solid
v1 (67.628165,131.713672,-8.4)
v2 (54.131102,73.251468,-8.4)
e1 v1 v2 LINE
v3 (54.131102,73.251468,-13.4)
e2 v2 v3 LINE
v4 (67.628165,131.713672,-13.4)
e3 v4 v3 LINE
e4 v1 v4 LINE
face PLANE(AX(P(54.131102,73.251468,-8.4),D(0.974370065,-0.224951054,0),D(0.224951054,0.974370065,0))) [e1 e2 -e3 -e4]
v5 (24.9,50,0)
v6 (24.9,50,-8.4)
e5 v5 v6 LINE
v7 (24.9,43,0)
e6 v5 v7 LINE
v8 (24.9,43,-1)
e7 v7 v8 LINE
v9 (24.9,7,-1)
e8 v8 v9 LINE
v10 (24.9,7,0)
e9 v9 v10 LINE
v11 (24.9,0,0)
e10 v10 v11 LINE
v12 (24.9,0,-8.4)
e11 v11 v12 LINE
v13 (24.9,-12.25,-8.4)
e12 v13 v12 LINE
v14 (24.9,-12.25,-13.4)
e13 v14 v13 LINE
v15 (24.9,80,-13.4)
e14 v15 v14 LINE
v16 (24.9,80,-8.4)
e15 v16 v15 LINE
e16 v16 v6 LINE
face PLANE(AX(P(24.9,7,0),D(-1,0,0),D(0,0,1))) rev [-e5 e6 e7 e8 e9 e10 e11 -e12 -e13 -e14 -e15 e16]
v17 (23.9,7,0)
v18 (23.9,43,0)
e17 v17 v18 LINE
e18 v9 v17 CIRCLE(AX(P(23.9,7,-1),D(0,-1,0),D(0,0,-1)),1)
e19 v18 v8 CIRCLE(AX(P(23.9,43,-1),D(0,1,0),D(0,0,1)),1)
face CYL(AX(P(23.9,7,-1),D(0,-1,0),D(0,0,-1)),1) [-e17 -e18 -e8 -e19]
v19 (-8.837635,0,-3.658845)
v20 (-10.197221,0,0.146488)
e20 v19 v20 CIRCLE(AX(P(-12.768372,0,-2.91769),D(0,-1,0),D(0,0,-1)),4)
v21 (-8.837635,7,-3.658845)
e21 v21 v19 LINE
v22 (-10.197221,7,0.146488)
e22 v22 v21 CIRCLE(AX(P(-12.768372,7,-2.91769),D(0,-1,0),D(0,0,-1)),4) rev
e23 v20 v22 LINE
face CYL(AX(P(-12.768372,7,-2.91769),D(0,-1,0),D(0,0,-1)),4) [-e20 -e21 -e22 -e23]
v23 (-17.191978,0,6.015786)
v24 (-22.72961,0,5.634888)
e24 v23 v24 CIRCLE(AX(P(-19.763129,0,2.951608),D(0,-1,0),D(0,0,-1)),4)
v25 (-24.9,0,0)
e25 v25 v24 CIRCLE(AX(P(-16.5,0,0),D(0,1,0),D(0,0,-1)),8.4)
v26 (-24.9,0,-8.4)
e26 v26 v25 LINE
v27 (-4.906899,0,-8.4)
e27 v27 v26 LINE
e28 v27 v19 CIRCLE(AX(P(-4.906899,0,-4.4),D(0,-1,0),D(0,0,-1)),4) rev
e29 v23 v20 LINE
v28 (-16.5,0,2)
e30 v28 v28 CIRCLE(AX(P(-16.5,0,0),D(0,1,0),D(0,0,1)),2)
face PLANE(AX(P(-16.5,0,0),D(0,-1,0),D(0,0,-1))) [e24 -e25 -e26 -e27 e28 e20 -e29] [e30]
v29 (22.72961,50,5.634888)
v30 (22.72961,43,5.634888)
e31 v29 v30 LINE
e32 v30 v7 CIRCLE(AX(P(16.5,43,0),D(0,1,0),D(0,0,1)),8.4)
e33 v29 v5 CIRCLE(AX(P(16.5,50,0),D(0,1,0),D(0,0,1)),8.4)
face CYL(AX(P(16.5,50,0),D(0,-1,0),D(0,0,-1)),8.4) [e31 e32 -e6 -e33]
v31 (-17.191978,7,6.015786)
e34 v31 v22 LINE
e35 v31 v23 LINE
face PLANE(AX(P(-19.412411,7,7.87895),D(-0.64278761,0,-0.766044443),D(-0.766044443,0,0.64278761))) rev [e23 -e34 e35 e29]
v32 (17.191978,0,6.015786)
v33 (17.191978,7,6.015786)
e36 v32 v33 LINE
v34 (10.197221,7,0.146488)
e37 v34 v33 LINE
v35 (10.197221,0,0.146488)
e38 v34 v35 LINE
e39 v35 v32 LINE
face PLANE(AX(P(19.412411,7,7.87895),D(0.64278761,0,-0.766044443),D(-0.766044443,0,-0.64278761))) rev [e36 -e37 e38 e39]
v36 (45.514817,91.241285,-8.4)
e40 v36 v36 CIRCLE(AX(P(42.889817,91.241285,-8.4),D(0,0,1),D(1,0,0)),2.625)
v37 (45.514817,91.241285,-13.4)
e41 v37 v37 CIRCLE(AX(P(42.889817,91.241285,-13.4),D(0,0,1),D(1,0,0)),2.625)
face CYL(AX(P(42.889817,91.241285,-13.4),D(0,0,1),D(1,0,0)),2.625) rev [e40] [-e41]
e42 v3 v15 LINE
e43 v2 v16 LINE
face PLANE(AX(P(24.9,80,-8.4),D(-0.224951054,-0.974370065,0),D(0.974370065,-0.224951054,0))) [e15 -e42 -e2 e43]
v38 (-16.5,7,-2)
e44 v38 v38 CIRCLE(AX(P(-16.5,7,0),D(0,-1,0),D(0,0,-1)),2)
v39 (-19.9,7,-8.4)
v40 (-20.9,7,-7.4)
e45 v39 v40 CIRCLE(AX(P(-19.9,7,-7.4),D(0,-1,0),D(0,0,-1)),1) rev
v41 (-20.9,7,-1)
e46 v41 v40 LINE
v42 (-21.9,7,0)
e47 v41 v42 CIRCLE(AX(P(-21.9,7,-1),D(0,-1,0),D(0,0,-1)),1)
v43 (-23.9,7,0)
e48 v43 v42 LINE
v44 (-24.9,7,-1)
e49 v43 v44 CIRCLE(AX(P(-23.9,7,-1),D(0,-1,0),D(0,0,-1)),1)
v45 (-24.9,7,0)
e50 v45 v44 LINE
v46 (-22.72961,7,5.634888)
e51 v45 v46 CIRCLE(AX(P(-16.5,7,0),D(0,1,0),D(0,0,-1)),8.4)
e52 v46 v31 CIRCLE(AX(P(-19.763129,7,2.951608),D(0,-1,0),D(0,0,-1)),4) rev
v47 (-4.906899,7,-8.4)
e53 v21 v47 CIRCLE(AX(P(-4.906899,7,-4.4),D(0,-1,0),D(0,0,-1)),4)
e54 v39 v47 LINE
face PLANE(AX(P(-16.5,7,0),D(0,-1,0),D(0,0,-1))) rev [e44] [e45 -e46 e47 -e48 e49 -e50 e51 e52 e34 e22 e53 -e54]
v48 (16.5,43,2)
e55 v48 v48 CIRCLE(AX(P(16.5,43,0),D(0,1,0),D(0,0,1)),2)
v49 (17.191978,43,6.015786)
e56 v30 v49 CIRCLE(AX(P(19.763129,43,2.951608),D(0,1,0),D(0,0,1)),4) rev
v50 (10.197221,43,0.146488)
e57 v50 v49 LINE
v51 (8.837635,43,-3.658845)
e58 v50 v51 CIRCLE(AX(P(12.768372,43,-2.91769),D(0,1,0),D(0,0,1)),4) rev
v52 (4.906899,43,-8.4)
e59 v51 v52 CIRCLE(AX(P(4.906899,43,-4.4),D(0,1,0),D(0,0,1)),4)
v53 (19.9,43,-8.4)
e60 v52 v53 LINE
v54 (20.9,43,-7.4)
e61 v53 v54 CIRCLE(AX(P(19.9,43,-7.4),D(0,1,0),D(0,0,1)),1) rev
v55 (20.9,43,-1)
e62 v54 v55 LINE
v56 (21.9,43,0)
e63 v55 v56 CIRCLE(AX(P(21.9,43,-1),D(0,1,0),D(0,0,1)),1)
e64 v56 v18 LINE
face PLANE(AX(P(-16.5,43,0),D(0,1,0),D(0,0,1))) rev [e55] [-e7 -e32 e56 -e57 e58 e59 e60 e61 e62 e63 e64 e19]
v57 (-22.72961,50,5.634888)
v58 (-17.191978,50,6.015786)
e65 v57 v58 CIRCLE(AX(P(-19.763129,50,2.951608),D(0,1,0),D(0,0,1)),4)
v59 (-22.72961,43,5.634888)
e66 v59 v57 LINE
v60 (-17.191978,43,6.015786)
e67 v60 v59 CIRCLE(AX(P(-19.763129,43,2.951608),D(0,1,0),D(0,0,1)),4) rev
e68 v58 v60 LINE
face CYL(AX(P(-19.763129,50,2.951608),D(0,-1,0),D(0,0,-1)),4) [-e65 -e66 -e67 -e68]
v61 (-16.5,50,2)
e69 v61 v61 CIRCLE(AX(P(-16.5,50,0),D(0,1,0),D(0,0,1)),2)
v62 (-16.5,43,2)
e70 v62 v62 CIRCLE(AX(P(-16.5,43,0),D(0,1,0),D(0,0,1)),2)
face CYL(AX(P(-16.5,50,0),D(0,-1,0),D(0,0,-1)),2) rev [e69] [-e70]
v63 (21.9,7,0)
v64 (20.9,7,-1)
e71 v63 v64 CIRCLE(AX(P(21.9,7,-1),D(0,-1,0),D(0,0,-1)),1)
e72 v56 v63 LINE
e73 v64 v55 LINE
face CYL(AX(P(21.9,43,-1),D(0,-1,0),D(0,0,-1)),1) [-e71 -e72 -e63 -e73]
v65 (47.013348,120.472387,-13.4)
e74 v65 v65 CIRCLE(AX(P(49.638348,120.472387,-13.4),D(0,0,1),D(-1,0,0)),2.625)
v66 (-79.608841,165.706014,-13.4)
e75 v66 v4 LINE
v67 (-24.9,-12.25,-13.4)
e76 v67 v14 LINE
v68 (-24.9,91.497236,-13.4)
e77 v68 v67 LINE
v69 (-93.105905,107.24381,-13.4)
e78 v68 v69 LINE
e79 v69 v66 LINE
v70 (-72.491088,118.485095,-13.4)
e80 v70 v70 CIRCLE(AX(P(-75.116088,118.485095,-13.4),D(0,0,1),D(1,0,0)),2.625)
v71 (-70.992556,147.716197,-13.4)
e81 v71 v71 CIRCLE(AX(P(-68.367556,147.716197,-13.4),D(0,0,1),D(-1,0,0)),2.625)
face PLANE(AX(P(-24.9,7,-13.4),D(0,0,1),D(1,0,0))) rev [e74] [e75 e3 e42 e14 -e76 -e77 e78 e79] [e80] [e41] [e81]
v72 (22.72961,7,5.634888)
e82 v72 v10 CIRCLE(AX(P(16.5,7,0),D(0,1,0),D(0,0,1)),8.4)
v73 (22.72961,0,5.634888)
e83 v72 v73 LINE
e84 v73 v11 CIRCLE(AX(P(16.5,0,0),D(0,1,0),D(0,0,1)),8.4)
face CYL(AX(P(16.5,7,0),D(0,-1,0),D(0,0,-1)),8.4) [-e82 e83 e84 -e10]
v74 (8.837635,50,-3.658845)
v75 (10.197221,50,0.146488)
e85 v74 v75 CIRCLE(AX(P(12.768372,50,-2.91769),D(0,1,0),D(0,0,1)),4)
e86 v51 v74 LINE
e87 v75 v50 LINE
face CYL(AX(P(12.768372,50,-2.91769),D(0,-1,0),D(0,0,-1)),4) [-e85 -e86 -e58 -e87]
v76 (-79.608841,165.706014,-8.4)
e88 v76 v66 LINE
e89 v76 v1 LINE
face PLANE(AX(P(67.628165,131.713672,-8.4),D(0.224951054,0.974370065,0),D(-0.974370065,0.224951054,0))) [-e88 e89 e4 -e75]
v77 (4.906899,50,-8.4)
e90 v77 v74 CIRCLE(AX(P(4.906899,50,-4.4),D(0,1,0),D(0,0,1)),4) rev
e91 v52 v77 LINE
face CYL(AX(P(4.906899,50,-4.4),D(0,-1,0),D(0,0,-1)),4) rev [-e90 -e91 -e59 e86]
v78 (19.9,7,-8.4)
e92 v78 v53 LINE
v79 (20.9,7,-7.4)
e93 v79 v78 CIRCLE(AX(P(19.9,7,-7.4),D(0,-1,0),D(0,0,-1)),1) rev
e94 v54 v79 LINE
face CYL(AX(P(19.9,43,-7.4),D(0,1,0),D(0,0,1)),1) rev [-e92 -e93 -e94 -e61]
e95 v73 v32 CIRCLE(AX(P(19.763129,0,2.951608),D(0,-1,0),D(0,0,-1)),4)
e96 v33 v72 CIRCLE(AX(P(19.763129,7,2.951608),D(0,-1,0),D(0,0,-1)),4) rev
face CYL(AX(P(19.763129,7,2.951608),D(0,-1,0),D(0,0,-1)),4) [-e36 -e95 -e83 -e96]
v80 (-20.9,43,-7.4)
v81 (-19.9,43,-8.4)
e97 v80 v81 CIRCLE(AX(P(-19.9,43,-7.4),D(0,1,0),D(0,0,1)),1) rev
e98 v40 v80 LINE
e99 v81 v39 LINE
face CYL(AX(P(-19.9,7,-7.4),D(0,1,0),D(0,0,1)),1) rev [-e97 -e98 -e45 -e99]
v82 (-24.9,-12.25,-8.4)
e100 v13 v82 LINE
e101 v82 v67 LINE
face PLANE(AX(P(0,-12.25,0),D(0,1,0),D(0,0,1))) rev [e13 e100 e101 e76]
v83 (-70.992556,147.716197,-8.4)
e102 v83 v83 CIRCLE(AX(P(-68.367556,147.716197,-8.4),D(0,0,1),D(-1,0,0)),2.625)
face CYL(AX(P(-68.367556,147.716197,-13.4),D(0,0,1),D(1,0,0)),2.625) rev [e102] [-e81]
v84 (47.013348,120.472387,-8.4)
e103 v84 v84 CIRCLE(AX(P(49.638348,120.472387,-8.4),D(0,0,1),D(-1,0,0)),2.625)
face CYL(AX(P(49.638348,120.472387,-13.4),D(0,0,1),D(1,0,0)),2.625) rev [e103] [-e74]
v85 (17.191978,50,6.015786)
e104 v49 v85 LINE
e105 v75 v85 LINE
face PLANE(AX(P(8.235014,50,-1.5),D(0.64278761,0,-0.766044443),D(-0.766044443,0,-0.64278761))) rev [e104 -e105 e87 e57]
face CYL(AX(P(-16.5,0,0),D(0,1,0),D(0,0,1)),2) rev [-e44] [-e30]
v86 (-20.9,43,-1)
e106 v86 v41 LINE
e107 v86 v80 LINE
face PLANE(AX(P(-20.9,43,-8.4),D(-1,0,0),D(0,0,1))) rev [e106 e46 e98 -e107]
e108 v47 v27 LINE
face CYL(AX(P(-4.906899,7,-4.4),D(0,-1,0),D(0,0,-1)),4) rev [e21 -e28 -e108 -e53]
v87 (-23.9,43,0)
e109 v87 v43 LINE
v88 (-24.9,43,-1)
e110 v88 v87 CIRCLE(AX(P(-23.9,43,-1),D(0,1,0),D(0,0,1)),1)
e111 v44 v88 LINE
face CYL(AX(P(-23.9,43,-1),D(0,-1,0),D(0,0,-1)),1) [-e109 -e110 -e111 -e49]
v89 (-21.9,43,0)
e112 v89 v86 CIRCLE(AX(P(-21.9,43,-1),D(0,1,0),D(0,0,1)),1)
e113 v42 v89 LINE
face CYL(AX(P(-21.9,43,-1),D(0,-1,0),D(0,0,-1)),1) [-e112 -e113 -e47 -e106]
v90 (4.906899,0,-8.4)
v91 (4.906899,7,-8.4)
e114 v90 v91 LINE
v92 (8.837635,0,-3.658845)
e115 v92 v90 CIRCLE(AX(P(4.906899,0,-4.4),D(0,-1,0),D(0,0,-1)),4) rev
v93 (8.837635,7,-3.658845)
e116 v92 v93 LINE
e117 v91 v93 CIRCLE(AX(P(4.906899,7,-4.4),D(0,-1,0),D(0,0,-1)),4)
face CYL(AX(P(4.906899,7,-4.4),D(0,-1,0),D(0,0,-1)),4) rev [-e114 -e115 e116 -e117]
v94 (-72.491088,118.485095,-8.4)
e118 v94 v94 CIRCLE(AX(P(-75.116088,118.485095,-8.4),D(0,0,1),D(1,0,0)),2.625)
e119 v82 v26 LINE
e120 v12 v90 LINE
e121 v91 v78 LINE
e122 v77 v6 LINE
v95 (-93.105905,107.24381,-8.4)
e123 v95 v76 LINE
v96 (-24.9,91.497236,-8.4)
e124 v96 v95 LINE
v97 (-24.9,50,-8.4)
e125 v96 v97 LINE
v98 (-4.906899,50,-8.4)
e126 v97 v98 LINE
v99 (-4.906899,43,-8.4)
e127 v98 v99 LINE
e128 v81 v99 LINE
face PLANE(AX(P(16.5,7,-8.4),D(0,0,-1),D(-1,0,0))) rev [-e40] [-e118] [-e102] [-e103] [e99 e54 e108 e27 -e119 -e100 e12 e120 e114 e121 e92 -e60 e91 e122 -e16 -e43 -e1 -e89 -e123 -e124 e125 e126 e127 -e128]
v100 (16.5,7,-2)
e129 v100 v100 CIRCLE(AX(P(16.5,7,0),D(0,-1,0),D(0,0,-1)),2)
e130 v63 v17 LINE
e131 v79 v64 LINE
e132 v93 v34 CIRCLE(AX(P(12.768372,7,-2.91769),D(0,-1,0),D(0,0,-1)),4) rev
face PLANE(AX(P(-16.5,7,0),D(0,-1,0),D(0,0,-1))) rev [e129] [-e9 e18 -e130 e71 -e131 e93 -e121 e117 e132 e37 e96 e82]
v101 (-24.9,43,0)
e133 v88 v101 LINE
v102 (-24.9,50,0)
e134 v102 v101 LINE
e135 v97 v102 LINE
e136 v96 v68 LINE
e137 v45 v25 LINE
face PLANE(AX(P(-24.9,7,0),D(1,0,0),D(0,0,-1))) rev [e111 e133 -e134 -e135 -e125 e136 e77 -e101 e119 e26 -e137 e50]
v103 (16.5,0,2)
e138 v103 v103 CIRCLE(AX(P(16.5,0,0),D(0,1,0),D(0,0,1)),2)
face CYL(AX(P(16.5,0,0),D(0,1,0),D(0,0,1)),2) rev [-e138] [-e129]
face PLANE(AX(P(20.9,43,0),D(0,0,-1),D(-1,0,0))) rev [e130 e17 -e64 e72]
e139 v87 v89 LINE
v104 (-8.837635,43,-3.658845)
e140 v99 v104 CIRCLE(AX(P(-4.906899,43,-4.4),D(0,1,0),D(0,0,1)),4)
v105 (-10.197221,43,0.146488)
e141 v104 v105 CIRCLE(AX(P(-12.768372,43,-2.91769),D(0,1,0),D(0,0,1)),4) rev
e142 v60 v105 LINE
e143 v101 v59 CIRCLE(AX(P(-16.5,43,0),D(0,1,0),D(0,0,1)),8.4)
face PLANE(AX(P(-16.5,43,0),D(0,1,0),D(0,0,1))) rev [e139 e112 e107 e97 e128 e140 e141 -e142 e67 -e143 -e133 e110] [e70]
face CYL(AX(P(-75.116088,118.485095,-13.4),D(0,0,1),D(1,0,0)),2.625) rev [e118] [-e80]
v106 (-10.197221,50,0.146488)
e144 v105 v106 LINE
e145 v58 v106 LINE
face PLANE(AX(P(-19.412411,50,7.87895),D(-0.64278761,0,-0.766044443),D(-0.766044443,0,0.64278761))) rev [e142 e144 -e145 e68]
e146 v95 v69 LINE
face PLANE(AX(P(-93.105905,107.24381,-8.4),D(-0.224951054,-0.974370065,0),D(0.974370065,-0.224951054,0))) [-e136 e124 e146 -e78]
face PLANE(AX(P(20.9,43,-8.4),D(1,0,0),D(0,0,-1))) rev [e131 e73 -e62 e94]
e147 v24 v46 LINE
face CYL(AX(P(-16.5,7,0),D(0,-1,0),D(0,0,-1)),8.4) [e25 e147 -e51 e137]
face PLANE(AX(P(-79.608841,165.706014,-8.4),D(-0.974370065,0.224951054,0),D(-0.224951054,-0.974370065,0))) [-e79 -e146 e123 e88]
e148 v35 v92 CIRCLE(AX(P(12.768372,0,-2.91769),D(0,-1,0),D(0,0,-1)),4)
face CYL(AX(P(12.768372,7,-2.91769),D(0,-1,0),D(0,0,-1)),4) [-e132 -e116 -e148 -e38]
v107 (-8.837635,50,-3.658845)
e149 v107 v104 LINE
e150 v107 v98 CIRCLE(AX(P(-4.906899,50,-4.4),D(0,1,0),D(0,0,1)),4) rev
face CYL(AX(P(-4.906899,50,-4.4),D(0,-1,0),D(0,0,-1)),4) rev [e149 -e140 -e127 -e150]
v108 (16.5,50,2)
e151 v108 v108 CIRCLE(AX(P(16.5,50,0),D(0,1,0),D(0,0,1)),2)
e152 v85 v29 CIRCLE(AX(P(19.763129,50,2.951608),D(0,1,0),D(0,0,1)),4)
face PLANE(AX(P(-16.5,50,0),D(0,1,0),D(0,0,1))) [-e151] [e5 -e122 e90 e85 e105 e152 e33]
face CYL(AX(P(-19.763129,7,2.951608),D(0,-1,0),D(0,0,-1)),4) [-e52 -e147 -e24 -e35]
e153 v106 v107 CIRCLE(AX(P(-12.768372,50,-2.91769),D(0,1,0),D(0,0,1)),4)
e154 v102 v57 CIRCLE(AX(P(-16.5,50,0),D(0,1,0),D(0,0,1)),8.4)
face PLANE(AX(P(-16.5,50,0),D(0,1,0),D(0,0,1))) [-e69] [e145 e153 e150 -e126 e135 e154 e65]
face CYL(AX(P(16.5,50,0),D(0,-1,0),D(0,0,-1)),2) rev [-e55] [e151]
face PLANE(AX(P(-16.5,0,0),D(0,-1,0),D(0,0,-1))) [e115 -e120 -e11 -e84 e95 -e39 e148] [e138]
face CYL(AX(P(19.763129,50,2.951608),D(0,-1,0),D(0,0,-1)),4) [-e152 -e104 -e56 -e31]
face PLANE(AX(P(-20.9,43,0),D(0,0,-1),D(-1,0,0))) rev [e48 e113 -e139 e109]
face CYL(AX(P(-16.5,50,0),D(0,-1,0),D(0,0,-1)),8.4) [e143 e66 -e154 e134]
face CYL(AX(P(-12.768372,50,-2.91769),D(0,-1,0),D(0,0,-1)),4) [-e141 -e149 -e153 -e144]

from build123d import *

# Parameters (mm, degrees)
BOSS_EXTRUDE2_DEPTH     = 7
CUT_EXTRUDE2_DEPTH      = 30.130224853
CUT_EXTRUDE2_DEPTH_BACK = 30.130224853
SKETCH3_R               = 2
BOSS_EXTRUDE3_DEPTH     = 36
SKETCH5_R               = 2
BOSS_EXTRUDE4_DEPTH     = 7
SKETCH14_W              = 49.8
SKETCH14_H              = 5
BOSS_EXTRUDE7_DEPTH     = 30
SKETCH16_W              = 49.8
SKETCH16_H              = 5
BOSS_EXTRUDE8_DEPTH     = 12.25
BOSS_EXTRUDE9_DEPTH     = 5
FILLET1_DEPTH           = 50
FILLET1_2_DEPTH         = 7
FILLET1_START           = 43
FILLET1_3_DEPTH         = 7
FILLET2_R               = 4
FILLET3_R               = 1
CUT_EXTRUDE3_DEPTH      = 191.690493415
CUT_EXTRUDE3_DEPTH_BACK = 191.690493415
SKETCH19_R              = 2.625


with BuildPart() as part:
    # Sketch1 → Boss-Extrude2 (new body)
    with BuildSketch(Plane(origin=(0, 0, 0), x_dir=(1, 0, 0), z_dir=(0, 1, 0))):
        with BuildLine():
            Line((-24.9, 0), (-24.9, 13.4))
            Line((-24.9, 13.4), (24.9, 13.4))
            Line((24.9, 13.4), (24.9, 0))
            ThreePointArc((24.9, 0), (23.392904185, -4.800819919), (19.412411454, -7.878950407))
            Line((19.412411454, -7.878950407), (8.235013612, 1.5))
            ThreePointArc((8.235013612, 1.5), (11.116692467, 6.448255578), (16.5, 8.4))
            Line((16.5, 8.4), (-16.5, 8.4))
            ThreePointArc((-16.5, 8.4), (-11.116692467, 6.448255578), (-8.235013612, 1.5))
            Line((-8.235013612, 1.5), (-19.412411454, -7.878950407))
            ThreePointArc((-19.412411454, -7.878950407), (-23.392904185, -4.800819919), (-24.9, 0))
        make_face()
    extrude(amount=BOSS_EXTRUDE2_DEPTH)

    # Sketch3 → Cut-Extrude2 (cut, two sides: drawn at the far end of the back side and taken through both)
    with BuildSketch(Plane(origin=(0, 7, 0), x_dir=(1, 0, 0), z_dir=(0, 1, 0)).offset(-CUT_EXTRUDE2_DEPTH_BACK)):
        with Locations(Location((-16.5, 0, 0), (0, 0, 270))):
            Circle(SKETCH3_R)
        with Locations(Location((16.5, 0, 0), (0, 0, 270))):
            Circle(SKETCH3_R)
    extrude(amount=CUT_EXTRUDE2_DEPTH + CUT_EXTRUDE2_DEPTH_BACK, mode=Mode.SUBTRACT)

    # Sketch4 → Boss-Extrude3 (add)
    with BuildSketch(Plane(origin=(0, 7, 0), x_dir=(1, 0, 0), z_dir=(0, 1, 0))):
        Polygon((-24.9, 13.4), (-24.9, 0), (-20.9, 0), (-20.9, 8.4), (-16.5, 8.4), (16.5, 8.4), (20.9, 8.4), (20.9, 0), (24.9, 0), (24.9, 13.4), align=None)
    extrude(amount=BOSS_EXTRUDE3_DEPTH)

    # Sketch5 → Boss-Extrude4 (add)
    with BuildSketch(Plane(origin=(0, 43, 0), x_dir=(1, 0, 0), z_dir=(0, 1, 0))):
        with BuildLine():
            Line((-24.9, 13.4), (-24.9, 0))
            ThreePointArc((-24.9, 0), (-23.392904185, -4.800819919), (-19.412411454, -7.878950407))
            Line((-19.412411454, -7.878950407), (-8.235013612, 1.5))
            ThreePointArc((-8.235013612, 1.5), (-11.116692467, 6.448255578), (-16.5, 8.4))
            Line((-16.5, 8.4), (16.5, 8.4))
            ThreePointArc((16.5, 8.4), (11.116692467, 6.448255578), (8.235013612, 1.5))
            Line((8.235013612, 1.5), (19.412411454, -7.878950407))
            ThreePointArc((19.412411454, -7.878950407), (23.392904185, -4.800819919), (24.9, 0))
            Line((24.9, 0), (24.9, 13.4))
            Line((24.9, 13.4), (-24.9, 13.4))
        make_face()
        with Locations(Location((16.5, 0, 0), (0, 0, 270))):
            Circle(SKETCH5_R, mode=Mode.SUBTRACT)
        with Locations(Location((-16.5, 0, 0), (0, 0, 270))):
            Circle(SKETCH5_R, mode=Mode.SUBTRACT)
    extrude(amount=BOSS_EXTRUDE4_DEPTH)

    # Sketch14 → Boss-Extrude7 (add)
    with BuildSketch(Plane(origin=(0, 50, 0), x_dir=(1, 0, 0), z_dir=(0, 1, 0))):
        with Locations((0, 10.9)):
            Rectangle(SKETCH14_W, SKETCH14_H)
    extrude(amount=BOSS_EXTRUDE7_DEPTH)

    # Sketch16 → Boss-Extrude8 (add)
    with BuildSketch(Plane.XZ):
        with Locations((0, -10.9)):
            Rectangle(SKETCH16_W, SKETCH16_H)
    extrude(amount=BOSS_EXTRUDE8_DEPTH)

    # Sketch17 → Boss-Extrude9 (add)
    with BuildSketch(Plane(origin=(0, 0, -13.4), x_dir=(-1, 0, 0), z_dir=(0, 0, -1))):
        Polygon((24.9, 80), (-24.9, 80), (-54.131101944, 73.25146837), (-67.628165204, 131.713672257), (79.608841274, 165.706013609), (93.105904535, 107.243809722), (24.9, 91.497235918), align=None)
    extrude(amount=-BOSS_EXTRUDE9_DEPTH)

    # Fillet1: read off the stored shape, not the designer's step
    # Fillet1 outline → Fillet1 (cut)
    with BuildSketch(Plane(origin=(0, 0, 0), x_dir=(1, 0, 0), z_dir=(0, 1, 0))):
        with BuildLine():
            Line((-19.412411454, -7.878950407), (-17.191978394, -6.015785846))
            ThreePointArc((-17.191978394, -6.015785846), (-20.037614317, -6.942179175), (-22.729609591, -5.63488814))
            ThreePointArc((-22.729609591, -5.63488814), (-21.206707029, -6.957507379), (-19.412411454, -7.878950407))
        make_face()
        with BuildLine():
            ThreePointArc((22.729609591, -5.63488814), (20.037614317, -6.942179175), (17.191978394, -6.015785846))
            Line((17.191978394, -6.015785846), (19.412411454, -7.878950407))
            ThreePointArc((19.412411454, -7.878950407), (21.206707029, -6.957507379), (22.729609591, -5.63488814))
        make_face()
    extrude(amount=FILLET1_DEPTH, mode=Mode.SUBTRACT)

    # Fillet1 2 outline → Fillet1 2 (add)
    with BuildSketch(Plane(origin=(0, 0, 0), x_dir=(1, 0, 0), z_dir=(0, 1, 0))):
        with BuildLine():
            Line((16.5, 8.4), (4.906898603, 8.4))
            ThreePointArc((4.906898603, 8.4), (8.19911817, 6.671847337), (8.646608731, 2.980645161))
            ThreePointArc((8.646608731, 2.980645161), (11.729120592, 6.91366109), (16.5, 8.4))
        make_face()
        with BuildLine():
            ThreePointArc((-16.5, 8.4), (-11.729120592, 6.91366109), (-8.646608731, 2.980645161))
            ThreePointArc((-8.646608731, 2.980645161), (-8.19911817, 6.671847337), (-4.906898603, 8.4))
            Line((-4.906898603, 8.4), (-16.5, 8.4))
        make_face()
    extrude(amount=FILLET1_2_DEPTH)

    # Fillet1 3 outline → Fillet1 3 (add)
    with BuildSketch(Plane(origin=(0, 0, 0), x_dir=(1, 0, 0), z_dir=(0, 1, 0)).offset(FILLET1_START)):
        with BuildLine():
            Line((16.5, 8.4), (4.906898603, 8.4))
            ThreePointArc((4.906898603, 8.4), (8.19911817, 6.671847337), (8.646608731, 2.980645161))
            ThreePointArc((8.646608731, 2.980645161), (11.729120592, 6.91366109), (16.5, 8.4))
        make_face()
        with BuildLine():
            ThreePointArc((-16.5, 8.4), (-11.729120592, 6.91366109), (-8.646608731, 2.980645161))
            ThreePointArc((-8.646608731, 2.980645161), (-8.19911817, 6.671847337), (-4.906898603, 8.4))
            Line((-4.906898603, 8.4), (-16.5, 8.4))
        make_face()
    extrude(amount=FILLET1_3_DEPTH)

    # Fillet2
    fillet2_edges = [part.edges().sort_by_distance(p)[0] for p in [
        (8.235013612, 46.5, -1.5),
        (-8.235013612, 46.5, -1.5),
        (8.235013612, 3.5, -1.5),
        (-8.235013612, 3.5, -1.5),
    ]]
    fillet(fillet2_edges, radius=FILLET2_R)

    # Fillet3
    fillet3_edges = [part.edges().sort_by_distance(p)[0] for p in [
        (-24.9, 25, 0),
        (-20.9, 25, 0),
        (-20.9, 25, -8.4),
        (20.9, 25, -8.4),
        (20.9, 25, 0),
        (24.9, 25, 0),
    ]]
    fillet(fillet3_edges, radius=FILLET3_R)

    # Sketch19 → Cut-Extrude3 (cut, two sides: drawn at the far end of the back side and taken through both)
    with BuildSketch(Plane.XY.offset(-8.4).offset(-CUT_EXTRUDE3_DEPTH_BACK)):
        with Locations((-75.116087748, 118.485094879)):
            Circle(SKETCH19_R)
        with Locations((42.889816787, 91.241285157)):
            Circle(SKETCH19_R)
        with Locations(Location((49.638348417, 120.4723871, 0), (0, 0, 180))):
            Circle(SKETCH19_R)
        with Locations(Location((-68.367556118, 147.716196822, 0), (0, 0, 180))):
            Circle(SKETCH19_R)
    extrude(amount=CUT_EXTRUDE3_DEPTH + CUT_EXTRUDE3_DEPTH_BACK, mode=Mode.SUBTRACT)


solid = part.part
